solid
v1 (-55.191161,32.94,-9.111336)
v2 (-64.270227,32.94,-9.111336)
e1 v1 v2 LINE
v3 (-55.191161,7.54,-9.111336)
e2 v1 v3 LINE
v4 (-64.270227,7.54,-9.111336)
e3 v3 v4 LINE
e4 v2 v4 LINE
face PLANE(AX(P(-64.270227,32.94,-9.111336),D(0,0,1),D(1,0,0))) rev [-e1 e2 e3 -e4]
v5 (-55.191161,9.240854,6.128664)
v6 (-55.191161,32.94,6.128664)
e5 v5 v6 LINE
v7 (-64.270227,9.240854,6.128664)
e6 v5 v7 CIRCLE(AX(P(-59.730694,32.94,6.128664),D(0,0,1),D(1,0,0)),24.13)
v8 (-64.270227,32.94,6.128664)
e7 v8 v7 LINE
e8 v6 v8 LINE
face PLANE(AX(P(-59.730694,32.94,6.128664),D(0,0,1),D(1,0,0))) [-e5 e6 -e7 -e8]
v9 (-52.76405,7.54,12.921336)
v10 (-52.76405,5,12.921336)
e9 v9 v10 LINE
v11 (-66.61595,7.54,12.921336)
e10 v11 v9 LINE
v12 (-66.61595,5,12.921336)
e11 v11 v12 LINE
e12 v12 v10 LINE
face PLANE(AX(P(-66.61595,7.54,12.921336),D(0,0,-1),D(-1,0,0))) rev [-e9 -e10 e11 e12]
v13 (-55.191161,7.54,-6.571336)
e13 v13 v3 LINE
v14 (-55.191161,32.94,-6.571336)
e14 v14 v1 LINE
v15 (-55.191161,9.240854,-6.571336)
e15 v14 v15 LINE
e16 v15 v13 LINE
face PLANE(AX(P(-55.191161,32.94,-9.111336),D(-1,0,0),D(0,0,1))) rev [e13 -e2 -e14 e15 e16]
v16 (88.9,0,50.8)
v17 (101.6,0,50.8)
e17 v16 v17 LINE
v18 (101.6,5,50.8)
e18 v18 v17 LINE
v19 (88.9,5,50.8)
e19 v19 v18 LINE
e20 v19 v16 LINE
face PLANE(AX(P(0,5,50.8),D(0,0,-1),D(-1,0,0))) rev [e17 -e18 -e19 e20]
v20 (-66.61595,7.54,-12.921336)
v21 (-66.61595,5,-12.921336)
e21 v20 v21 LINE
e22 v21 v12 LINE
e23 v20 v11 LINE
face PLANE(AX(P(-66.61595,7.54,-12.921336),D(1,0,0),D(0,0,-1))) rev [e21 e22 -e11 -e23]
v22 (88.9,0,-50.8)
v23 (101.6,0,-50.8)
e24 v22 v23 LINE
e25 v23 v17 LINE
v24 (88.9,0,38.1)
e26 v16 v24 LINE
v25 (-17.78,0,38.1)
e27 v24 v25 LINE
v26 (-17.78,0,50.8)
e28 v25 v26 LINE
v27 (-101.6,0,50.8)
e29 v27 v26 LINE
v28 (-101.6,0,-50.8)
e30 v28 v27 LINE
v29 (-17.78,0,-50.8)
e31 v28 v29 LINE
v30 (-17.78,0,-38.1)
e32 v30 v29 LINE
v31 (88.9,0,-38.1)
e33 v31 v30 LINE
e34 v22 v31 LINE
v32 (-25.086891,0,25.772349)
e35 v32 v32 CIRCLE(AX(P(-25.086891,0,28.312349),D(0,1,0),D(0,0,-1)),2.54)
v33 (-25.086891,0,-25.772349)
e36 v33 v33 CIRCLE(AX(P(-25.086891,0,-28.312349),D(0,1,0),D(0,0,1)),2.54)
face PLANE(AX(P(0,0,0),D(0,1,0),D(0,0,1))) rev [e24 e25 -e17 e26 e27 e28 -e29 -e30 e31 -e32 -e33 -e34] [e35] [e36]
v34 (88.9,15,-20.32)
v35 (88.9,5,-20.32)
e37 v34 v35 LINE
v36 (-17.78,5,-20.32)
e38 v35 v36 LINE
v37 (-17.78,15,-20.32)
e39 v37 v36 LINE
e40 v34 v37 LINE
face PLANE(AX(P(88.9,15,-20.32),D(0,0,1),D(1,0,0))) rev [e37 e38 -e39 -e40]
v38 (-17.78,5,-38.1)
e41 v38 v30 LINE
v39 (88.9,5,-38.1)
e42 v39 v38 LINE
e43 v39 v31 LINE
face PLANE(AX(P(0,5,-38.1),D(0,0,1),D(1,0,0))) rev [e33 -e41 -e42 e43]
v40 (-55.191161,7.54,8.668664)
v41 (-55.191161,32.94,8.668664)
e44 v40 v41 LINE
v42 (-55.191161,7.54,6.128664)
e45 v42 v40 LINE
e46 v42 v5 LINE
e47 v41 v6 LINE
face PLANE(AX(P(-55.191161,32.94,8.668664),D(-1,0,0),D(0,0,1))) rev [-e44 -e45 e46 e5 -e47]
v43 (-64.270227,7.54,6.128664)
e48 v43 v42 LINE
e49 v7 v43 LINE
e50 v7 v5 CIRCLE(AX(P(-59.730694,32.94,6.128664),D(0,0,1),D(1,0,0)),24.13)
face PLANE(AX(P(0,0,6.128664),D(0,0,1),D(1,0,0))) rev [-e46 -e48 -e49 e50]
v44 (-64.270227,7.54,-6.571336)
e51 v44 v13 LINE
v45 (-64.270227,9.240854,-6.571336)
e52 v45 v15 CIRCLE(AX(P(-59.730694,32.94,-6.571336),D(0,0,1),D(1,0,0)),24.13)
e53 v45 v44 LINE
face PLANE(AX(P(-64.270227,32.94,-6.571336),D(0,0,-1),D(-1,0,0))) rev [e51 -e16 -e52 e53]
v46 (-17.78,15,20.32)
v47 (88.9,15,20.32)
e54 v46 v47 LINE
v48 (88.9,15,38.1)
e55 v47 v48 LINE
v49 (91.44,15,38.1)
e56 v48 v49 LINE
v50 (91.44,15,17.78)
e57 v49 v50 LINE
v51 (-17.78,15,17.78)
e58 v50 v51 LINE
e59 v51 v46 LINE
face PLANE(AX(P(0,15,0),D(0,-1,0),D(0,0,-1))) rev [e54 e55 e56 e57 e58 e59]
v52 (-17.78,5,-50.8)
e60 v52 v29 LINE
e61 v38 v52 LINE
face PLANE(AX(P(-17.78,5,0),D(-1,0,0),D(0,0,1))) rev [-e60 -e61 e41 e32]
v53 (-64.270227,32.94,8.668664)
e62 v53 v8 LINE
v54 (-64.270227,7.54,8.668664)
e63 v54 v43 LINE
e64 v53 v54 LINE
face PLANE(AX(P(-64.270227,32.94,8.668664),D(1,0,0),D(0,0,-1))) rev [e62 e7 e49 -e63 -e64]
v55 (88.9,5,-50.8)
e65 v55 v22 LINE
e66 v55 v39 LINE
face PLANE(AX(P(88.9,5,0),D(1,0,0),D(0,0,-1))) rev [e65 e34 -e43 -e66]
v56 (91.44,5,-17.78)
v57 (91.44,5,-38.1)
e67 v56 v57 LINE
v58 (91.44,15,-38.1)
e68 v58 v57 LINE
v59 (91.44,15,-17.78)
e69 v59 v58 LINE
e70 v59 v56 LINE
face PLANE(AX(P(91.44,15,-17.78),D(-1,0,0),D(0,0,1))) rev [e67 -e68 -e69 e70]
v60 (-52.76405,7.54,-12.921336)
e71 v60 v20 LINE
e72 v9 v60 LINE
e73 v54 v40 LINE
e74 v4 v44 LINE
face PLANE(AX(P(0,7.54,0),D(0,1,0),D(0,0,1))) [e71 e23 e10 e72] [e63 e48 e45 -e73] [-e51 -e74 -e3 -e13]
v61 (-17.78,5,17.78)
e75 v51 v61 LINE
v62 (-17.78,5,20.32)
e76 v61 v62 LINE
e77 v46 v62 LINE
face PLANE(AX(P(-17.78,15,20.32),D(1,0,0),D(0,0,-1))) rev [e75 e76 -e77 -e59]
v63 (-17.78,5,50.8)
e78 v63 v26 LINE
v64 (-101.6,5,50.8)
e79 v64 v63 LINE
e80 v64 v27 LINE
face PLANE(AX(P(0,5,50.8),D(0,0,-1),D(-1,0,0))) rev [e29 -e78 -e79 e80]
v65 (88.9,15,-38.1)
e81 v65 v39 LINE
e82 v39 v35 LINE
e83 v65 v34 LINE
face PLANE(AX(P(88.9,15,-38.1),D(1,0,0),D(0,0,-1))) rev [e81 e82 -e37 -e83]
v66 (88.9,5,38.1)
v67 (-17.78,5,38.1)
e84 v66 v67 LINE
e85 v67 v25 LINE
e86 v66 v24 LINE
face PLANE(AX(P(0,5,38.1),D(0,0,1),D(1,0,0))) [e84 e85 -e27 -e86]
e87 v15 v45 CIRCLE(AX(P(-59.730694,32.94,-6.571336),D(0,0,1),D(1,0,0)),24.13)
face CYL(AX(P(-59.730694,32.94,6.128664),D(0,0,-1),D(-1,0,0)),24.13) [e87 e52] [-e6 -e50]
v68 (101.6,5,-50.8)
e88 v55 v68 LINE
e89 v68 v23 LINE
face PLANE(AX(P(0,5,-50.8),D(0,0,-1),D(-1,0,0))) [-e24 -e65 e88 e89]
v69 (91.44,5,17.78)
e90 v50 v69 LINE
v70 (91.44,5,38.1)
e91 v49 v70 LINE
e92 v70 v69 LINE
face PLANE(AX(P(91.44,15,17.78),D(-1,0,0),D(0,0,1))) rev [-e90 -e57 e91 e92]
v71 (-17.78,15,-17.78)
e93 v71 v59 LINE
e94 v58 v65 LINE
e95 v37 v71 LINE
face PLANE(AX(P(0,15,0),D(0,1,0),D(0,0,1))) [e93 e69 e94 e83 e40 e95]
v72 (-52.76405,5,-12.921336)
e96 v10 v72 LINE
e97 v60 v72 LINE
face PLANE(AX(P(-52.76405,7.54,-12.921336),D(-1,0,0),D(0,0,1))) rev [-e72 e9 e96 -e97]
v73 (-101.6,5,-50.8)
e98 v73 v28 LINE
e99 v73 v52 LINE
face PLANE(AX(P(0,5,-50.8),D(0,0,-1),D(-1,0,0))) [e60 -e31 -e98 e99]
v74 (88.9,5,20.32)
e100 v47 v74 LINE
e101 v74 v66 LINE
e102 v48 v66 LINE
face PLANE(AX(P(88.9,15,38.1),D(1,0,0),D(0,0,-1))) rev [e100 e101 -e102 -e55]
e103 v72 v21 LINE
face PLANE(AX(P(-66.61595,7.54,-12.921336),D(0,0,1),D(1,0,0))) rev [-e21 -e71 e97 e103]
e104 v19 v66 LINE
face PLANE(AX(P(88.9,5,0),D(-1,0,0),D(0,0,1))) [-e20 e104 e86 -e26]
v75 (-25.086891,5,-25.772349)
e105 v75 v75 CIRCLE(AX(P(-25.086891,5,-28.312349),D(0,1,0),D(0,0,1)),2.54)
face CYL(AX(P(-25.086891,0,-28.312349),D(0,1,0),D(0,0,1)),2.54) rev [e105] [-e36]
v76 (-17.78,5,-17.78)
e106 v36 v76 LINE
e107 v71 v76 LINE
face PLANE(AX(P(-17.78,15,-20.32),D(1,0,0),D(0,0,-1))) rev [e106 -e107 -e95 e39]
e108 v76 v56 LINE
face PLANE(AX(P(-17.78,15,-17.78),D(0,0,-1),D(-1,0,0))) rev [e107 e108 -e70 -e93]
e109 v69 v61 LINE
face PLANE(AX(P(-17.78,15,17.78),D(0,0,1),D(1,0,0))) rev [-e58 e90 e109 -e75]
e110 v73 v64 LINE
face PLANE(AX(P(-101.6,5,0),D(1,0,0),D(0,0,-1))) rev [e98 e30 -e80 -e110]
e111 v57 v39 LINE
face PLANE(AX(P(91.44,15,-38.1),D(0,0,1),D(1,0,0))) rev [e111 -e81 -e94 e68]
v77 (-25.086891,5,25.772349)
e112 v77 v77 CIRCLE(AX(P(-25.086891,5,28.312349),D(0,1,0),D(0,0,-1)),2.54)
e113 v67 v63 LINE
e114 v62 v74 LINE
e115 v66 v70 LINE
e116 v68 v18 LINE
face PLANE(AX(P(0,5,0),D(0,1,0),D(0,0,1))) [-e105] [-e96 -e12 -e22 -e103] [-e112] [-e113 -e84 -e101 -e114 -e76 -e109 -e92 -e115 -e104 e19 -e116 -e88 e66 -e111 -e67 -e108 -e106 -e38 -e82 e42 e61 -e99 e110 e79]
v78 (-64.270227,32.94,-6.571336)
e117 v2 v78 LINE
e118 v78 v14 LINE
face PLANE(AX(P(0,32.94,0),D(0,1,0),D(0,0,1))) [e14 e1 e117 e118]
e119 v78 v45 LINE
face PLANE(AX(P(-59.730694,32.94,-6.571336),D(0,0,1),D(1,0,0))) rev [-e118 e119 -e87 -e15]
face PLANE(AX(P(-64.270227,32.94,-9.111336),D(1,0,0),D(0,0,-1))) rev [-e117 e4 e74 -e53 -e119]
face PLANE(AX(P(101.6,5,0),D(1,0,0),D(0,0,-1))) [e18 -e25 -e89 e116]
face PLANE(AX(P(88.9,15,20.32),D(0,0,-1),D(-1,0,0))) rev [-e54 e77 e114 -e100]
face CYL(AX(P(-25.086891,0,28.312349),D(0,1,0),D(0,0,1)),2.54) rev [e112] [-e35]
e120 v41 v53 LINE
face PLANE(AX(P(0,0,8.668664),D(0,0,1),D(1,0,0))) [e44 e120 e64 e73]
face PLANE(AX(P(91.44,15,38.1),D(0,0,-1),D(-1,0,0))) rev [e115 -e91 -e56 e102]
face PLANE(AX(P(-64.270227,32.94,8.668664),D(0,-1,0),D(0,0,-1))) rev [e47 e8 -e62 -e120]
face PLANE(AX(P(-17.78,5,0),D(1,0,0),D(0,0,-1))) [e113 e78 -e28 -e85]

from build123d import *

# Parameters (mm, degrees)
BOSS_EXTRUDE1_DEPTH  = 5
BOSS_EXTRUDE2_DEPTH  = 10
SKETCH3_R            = 2.54
CUT_EXTRUDE1_DEPTH   = 115.031574575
SKETCH5_W            = 13.851899184
SKETCH5_H            = 25.842671822
BOSS_EXTRUDE3_DEPTH  = 2.54
SKETCH6_W            = 9.079065489
SKETCH6_H            = 2.54
BOSS_EXTRUDE7_DEPTH  = 25.4
SKETCH9_R            = 24.13
BOSS_EXTRUDE10_DEPTH = 12.7
SKETCH12_W           = 9.079065489
SKETCH12_H           = 25.611184956
BOSS_EXTRUDE11_DEPTH = 2.54


with BuildPart() as part:
    # Sketch1 → Boss-Extrude1 (new body)
    with BuildSketch(Plane(origin=(0, 0, 0), x_dir=(1, 0, 0), z_dir=(0, 1, 0))):
        Polygon((101.6, 50.8), (88.9, 50.8), (88.9, 38.1), (-17.78, 38.1), (-17.78, 50.8), (-101.6, 50.8), (-101.6, -50.8), (-17.78, -50.8), (-17.78, -38.1), (88.9, -38.1), (88.9, -50.8), (101.6, -50.8), align=None)
    extrude(amount=BOSS_EXTRUDE1_DEPTH)

    # Sketch2 → Boss-Extrude2 (add)
    with BuildSketch(Plane(origin=(0, 5, 0), x_dir=(1, 0, 0), z_dir=(0, 1, 0))):
        Polygon((88.9, -38.1), (88.9, -20.32), (-17.78, -20.32), (-17.78, -17.78), (91.44, -17.78), (91.44, -38.1), align=None)
        Polygon((91.44, 17.78), (91.44, 38.1), (88.9, 38.1), (88.9, 20.32), (-17.78, 20.32), (-17.78, 17.78), align=None)
    extrude(amount=BOSS_EXTRUDE2_DEPTH)

    # Sketch3 → Cut-Extrude1 (cut, through all)
    with BuildSketch(Plane(origin=(0, 5, 0), x_dir=(1, 0, 0), z_dir=(0, 1, 0))):
        with Locations((-25.086891482, 28.312348959)):
            Circle(SKETCH3_R)
        with Locations((-25.086891482, -28.312348959)):
            Circle(SKETCH3_R)
    extrude(amount=-CUT_EXTRUDE1_DEPTH, mode=Mode.SUBTRACT)

    # Sketch5 → Boss-Extrude3 (add)
    with BuildSketch(Plane(origin=(0, 5, 0), x_dir=(1, 0, 0), z_dir=(0, 1, 0))):
        with Locations((-59.69, 0)):
            Rectangle(SKETCH5_W, SKETCH5_H)
    extrude(amount=BOSS_EXTRUDE3_DEPTH)

    # Sketch6 → Boss-Extrude7 (add)
    with BuildSketch(Plane(origin=(0, 7.54, 0), x_dir=(1, 0, 0), z_dir=(0, 1, 0))):
        with Locations((-59.730694006, 7.841335911)):
            Rectangle(SKETCH6_W, SKETCH6_H)
    extrude(amount=BOSS_EXTRUDE7_DEPTH)

    # Sketch9 → Boss-Extrude10 (add)
    with BuildSketch(Plane.XY.offset(-6.571335911)):
        with Locations((-59.730694006, 32.94)):
            Circle(SKETCH9_R)
    extrude(amount=BOSS_EXTRUDE10_DEPTH)

    # Sketch12 → Boss-Extrude11 (add)
    with BuildSketch(Plane.XY.offset(6.128664089)):
        with Locations((-59.730694006, 20.134407522)):
            Rectangle(SKETCH12_W, SKETCH12_H)
    extrude(amount=BOSS_EXTRUDE11_DEPTH)


solid = part.part
